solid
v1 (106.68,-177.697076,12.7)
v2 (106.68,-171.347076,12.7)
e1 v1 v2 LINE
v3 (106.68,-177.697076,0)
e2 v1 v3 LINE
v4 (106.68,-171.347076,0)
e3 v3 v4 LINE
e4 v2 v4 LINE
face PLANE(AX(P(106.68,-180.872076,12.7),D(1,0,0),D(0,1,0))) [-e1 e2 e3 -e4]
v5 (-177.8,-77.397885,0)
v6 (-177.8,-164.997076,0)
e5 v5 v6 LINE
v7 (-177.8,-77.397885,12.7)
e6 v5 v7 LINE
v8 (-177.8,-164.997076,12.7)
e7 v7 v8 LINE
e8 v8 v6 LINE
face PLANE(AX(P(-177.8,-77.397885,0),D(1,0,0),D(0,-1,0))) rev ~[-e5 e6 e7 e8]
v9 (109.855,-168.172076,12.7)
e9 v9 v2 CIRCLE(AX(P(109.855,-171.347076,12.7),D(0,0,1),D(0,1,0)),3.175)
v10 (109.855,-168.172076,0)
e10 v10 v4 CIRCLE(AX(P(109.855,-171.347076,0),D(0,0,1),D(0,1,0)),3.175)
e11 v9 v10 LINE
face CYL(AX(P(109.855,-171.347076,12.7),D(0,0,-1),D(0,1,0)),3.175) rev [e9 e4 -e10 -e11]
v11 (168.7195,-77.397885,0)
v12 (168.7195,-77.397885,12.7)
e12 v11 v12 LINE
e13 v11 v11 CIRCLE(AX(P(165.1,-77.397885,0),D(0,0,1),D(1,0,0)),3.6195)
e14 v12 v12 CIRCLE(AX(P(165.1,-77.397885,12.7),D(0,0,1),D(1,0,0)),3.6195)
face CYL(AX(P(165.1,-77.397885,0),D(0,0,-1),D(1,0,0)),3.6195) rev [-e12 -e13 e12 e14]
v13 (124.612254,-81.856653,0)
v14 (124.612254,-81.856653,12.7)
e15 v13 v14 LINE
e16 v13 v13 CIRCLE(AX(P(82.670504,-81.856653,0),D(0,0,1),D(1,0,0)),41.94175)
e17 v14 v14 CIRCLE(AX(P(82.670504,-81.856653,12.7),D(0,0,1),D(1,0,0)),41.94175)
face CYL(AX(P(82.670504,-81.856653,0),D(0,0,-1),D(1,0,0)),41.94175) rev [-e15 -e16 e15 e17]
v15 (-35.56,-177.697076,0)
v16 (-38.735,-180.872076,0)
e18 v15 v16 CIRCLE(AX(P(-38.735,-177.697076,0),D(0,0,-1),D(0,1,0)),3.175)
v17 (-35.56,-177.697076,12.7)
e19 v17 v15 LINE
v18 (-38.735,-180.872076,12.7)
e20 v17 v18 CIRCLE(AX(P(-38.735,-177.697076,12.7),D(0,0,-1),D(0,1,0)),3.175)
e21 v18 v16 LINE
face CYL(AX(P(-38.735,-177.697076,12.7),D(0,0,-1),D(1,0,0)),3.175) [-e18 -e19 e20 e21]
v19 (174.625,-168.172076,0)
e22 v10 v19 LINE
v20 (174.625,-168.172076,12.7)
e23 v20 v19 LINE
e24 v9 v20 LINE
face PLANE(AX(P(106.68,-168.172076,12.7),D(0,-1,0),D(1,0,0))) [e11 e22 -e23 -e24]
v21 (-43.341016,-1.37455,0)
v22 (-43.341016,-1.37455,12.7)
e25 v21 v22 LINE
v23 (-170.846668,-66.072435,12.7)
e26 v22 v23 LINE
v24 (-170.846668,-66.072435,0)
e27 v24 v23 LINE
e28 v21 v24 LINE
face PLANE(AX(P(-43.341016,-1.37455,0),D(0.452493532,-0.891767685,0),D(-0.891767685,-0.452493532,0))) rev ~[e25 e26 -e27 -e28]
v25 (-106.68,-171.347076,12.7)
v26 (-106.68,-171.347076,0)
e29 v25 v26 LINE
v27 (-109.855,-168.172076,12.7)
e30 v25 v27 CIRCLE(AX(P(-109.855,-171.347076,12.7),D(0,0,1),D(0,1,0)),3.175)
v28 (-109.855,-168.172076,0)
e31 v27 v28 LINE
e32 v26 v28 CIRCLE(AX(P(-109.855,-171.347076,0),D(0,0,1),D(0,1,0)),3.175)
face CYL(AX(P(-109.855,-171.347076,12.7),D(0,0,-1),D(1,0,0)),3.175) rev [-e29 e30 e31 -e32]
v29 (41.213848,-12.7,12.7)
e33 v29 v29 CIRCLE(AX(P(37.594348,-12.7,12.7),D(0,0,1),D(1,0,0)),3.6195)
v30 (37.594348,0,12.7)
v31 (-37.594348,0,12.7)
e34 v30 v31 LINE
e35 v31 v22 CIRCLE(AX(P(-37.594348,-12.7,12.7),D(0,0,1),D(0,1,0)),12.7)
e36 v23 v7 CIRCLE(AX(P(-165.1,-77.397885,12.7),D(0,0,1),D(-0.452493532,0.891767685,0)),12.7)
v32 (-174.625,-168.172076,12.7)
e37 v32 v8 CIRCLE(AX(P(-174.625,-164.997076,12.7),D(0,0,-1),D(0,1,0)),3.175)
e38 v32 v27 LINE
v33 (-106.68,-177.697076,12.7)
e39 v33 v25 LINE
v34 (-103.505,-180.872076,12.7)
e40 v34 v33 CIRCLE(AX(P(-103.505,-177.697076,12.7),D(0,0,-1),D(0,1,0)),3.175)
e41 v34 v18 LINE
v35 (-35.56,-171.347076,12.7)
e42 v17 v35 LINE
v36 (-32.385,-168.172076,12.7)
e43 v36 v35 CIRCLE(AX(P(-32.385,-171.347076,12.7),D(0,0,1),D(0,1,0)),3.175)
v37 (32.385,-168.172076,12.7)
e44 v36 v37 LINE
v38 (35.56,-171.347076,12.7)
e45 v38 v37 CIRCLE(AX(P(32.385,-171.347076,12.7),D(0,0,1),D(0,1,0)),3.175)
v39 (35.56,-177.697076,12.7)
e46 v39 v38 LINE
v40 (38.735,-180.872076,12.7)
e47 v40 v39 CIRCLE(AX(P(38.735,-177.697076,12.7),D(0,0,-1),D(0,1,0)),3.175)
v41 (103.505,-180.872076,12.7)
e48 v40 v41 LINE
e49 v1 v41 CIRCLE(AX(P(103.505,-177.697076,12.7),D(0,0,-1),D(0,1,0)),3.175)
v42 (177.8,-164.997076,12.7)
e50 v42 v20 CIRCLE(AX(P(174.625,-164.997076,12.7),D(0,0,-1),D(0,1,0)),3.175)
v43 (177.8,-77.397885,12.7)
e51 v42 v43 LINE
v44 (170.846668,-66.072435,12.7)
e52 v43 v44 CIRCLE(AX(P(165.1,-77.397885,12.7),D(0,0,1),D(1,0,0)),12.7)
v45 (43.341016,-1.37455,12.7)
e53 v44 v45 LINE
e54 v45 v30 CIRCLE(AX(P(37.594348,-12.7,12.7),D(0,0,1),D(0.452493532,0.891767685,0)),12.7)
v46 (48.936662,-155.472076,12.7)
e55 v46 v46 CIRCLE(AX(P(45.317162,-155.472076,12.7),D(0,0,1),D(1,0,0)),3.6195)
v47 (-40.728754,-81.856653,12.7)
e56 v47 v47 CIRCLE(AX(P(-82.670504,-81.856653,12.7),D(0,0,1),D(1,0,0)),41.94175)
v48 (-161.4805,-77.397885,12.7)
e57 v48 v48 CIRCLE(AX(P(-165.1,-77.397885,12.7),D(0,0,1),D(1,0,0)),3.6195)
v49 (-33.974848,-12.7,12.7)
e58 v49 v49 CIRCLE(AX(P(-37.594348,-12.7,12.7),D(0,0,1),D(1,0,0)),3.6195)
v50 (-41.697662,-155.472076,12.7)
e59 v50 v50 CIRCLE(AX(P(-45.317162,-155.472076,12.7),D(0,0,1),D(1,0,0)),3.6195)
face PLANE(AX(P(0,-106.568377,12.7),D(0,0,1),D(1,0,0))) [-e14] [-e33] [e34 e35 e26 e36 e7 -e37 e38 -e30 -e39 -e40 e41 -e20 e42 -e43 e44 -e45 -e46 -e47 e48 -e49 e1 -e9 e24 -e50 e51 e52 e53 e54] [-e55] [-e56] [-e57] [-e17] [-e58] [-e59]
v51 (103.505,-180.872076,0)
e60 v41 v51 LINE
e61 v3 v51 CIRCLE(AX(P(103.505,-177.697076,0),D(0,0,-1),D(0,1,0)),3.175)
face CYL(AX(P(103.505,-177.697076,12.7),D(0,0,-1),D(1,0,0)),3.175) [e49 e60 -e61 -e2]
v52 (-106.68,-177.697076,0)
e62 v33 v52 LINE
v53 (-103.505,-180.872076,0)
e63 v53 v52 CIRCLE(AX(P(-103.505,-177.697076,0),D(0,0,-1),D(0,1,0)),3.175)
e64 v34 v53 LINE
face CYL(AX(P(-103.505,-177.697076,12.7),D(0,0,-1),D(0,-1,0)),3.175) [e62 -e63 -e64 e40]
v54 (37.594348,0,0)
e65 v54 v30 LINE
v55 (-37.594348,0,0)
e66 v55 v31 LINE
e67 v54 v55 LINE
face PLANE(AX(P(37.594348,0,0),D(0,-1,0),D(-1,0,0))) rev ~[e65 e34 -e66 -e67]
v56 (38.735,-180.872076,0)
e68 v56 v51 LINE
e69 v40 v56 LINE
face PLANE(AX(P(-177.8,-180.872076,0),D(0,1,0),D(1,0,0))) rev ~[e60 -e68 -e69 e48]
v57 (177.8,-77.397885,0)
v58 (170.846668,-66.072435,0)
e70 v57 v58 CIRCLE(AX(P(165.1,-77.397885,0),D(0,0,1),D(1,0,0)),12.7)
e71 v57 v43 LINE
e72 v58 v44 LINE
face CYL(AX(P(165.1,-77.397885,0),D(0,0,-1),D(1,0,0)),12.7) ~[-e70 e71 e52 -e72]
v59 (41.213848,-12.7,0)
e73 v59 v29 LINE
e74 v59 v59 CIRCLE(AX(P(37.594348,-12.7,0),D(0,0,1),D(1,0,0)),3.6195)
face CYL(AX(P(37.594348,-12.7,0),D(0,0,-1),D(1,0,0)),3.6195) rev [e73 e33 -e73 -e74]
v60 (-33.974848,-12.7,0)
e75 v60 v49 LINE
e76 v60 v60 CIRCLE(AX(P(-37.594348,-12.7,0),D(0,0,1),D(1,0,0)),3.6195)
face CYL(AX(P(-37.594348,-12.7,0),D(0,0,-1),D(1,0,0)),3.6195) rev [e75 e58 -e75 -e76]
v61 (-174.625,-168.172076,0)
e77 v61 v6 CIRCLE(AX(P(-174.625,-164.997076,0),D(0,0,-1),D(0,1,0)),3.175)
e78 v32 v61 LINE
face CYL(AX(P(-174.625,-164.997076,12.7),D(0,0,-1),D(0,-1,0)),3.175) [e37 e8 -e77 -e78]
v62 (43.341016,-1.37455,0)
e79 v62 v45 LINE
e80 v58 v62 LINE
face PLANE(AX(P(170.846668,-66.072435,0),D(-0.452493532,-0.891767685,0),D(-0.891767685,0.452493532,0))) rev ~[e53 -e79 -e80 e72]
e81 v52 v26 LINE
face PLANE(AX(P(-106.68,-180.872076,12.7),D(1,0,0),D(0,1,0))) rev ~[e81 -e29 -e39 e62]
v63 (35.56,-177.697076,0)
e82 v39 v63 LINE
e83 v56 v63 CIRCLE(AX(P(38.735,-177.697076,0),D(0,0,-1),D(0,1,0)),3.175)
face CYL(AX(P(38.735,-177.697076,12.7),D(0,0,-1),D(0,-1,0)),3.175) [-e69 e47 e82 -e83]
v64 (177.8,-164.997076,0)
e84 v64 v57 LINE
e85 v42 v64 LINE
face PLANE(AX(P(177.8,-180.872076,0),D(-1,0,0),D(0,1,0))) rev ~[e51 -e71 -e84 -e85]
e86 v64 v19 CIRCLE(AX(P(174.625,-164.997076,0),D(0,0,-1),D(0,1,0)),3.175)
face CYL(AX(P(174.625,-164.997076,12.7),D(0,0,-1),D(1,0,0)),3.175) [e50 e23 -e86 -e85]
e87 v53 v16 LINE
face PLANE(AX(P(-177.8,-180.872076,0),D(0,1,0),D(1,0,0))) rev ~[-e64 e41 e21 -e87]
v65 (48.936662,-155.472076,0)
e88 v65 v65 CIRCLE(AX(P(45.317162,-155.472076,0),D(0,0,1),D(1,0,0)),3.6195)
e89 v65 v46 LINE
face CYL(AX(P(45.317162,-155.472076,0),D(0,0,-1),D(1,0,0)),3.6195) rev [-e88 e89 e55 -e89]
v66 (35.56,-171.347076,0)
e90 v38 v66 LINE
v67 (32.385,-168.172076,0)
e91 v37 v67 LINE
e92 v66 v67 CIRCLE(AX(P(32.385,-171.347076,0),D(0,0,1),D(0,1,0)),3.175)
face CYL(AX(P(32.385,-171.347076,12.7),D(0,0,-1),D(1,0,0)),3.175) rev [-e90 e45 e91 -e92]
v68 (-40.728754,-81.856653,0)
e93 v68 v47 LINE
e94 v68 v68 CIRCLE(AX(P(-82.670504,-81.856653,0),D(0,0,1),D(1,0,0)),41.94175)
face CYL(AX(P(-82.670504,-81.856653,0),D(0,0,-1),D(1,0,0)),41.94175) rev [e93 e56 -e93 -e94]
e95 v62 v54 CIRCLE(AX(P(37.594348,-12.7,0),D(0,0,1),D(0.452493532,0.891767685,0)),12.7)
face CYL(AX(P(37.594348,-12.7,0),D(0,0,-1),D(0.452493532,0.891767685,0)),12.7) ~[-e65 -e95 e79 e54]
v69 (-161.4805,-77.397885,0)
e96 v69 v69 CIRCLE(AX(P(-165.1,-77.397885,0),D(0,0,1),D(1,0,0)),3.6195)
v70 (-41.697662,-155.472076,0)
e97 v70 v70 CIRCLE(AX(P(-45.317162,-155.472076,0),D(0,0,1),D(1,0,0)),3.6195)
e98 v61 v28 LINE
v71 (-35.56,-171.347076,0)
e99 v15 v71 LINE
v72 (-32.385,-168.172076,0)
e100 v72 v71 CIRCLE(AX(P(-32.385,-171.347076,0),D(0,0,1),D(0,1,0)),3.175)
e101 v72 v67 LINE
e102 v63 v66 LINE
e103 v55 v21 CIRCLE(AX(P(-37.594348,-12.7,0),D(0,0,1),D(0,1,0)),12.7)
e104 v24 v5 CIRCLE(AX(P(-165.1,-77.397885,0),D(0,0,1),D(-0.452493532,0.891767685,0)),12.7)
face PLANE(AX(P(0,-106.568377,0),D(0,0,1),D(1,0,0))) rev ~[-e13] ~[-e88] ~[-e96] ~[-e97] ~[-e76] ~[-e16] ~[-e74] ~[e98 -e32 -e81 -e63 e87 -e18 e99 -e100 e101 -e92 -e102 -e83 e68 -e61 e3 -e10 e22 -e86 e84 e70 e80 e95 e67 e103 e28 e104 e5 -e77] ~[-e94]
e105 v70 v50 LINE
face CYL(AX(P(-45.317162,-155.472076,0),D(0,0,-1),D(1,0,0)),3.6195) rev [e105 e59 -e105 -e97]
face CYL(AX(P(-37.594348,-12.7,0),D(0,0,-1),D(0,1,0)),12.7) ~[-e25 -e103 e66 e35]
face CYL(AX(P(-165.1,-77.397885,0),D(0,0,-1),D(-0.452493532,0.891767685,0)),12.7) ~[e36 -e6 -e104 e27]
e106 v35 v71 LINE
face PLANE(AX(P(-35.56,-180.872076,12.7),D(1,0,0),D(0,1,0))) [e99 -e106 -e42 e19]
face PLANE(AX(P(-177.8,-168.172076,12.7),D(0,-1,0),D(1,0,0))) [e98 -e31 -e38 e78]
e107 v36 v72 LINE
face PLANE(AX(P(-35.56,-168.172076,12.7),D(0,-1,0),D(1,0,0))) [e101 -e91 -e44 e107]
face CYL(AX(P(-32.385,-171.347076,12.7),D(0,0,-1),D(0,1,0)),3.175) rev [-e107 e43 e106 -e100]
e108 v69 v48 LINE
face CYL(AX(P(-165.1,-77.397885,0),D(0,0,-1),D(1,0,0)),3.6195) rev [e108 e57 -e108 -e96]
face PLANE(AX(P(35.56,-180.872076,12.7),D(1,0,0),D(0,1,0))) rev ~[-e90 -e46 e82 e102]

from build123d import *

# Parameters (mm, degrees)
F0_R     = 3.6195
F0_R_2   = 41.94175
F1_DEPTH = 12.7
F2_W     = 71.12
F2_H     = 12.7
F3_DEPTH = 12.7
F4_R     = 3.175


with BuildPart() as f1:
    # F0 (on Top) → F1 (new body)
    with BuildSketch(Plane.XY):
        with BuildLine():
            Line((37.5943482574, 0), (-37.5943482574, 0))
            ThreePointArc((-37.5943482574, 0), (-40.5487339943, -0.3484169064), (-43.3410161187, -1.3745504066))
            Line((-43.3410161187, -1.3745504066), (-170.8466678613, -66.0724350219))
            ThreePointArc((-170.8466678614, -66.0724350219), (-175.9229543527, -70.7530626401), (-177.8, -77.3978846153))
            Line((-177.8, -77.3978846153), (-177.8, -180.8720758428))
            Line((-177.8, -180.8720758428), (177.8, -180.8720758428))
            Line((177.8, -180.8720758428), (177.8, -77.3978846153))
            ThreePointArc((177.8, -77.3978846153), (175.9229543526, -70.7530626402), (170.8466678613, -66.0724350219))
            Line((170.8466678613, -66.0724350219), (43.3410161187, -1.3745504066))
            ThreePointArc((43.3410161187, -1.3745504066), (40.5487339943, -0.3484169064), (37.5943482574, 0))
        make_face()
        with Locations((-45.3171624807, -155.4720758428)):
            Circle(F0_R, mode=Mode.SUBTRACT)
        with Locations((45.3171624807, -155.4720758428)):
            Circle(F0_R, mode=Mode.SUBTRACT)
        with Locations((-165.1, -77.3978846153)):
            Circle(F0_R, mode=Mode.SUBTRACT)
        with Locations((-82.6705035794, -81.856653486)):
            Circle(F0_R_2, mode=Mode.SUBTRACT)
        with Locations((-37.5943482574, -12.7)):
            Circle(F0_R, mode=Mode.SUBTRACT)
        with Locations((82.6705035794, -81.856653486)):
            Circle(F0_R_2, mode=Mode.SUBTRACT)
        with Locations((165.1, -77.3978846153)):
            Circle(F0_R, mode=Mode.SUBTRACT)
        with Locations((37.5943482574, -12.7)):
            Circle(F0_R, mode=Mode.SUBTRACT)
    extrude(amount=F1_DEPTH)

    # F2 (on face) → F3 (cut, through all)
    with BuildSketch(Plane.XY.offset(12.7)):
        with Locations((-142.24, -174.5220758428)):
            Rectangle(F2_W, F2_H)
        with Locations((142.24, -174.5220758428)):
            Rectangle(F2_W, F2_H)
        with Locations((0, -174.5220758428)):
            Rectangle(F2_W, F2_H)
    extrude(amount=-F3_DEPTH, mode=Mode.SUBTRACT)

    # F4
    f4_edges = [f1.edges().sort_by_distance(p)[0] for p in [
        (-177.8, -168.172076, 6.35),
        (-106.68, -168.172076, 6.35),
        (-35.56, -168.172076, 6.35),
        (35.56, -168.172076, 6.35),
        (106.68, -168.172076, 6.35),
        (177.8, -168.172076, 6.35),
        (-106.68, -180.872076, 6.35),
        (-35.56, -180.872076, 6.35),
        (35.56, -180.872076, 6.35),
        (106.68, -180.872076, 6.35),
    ]]
    fillet(f4_edges, radius=F4_R)


solid = f1.part
